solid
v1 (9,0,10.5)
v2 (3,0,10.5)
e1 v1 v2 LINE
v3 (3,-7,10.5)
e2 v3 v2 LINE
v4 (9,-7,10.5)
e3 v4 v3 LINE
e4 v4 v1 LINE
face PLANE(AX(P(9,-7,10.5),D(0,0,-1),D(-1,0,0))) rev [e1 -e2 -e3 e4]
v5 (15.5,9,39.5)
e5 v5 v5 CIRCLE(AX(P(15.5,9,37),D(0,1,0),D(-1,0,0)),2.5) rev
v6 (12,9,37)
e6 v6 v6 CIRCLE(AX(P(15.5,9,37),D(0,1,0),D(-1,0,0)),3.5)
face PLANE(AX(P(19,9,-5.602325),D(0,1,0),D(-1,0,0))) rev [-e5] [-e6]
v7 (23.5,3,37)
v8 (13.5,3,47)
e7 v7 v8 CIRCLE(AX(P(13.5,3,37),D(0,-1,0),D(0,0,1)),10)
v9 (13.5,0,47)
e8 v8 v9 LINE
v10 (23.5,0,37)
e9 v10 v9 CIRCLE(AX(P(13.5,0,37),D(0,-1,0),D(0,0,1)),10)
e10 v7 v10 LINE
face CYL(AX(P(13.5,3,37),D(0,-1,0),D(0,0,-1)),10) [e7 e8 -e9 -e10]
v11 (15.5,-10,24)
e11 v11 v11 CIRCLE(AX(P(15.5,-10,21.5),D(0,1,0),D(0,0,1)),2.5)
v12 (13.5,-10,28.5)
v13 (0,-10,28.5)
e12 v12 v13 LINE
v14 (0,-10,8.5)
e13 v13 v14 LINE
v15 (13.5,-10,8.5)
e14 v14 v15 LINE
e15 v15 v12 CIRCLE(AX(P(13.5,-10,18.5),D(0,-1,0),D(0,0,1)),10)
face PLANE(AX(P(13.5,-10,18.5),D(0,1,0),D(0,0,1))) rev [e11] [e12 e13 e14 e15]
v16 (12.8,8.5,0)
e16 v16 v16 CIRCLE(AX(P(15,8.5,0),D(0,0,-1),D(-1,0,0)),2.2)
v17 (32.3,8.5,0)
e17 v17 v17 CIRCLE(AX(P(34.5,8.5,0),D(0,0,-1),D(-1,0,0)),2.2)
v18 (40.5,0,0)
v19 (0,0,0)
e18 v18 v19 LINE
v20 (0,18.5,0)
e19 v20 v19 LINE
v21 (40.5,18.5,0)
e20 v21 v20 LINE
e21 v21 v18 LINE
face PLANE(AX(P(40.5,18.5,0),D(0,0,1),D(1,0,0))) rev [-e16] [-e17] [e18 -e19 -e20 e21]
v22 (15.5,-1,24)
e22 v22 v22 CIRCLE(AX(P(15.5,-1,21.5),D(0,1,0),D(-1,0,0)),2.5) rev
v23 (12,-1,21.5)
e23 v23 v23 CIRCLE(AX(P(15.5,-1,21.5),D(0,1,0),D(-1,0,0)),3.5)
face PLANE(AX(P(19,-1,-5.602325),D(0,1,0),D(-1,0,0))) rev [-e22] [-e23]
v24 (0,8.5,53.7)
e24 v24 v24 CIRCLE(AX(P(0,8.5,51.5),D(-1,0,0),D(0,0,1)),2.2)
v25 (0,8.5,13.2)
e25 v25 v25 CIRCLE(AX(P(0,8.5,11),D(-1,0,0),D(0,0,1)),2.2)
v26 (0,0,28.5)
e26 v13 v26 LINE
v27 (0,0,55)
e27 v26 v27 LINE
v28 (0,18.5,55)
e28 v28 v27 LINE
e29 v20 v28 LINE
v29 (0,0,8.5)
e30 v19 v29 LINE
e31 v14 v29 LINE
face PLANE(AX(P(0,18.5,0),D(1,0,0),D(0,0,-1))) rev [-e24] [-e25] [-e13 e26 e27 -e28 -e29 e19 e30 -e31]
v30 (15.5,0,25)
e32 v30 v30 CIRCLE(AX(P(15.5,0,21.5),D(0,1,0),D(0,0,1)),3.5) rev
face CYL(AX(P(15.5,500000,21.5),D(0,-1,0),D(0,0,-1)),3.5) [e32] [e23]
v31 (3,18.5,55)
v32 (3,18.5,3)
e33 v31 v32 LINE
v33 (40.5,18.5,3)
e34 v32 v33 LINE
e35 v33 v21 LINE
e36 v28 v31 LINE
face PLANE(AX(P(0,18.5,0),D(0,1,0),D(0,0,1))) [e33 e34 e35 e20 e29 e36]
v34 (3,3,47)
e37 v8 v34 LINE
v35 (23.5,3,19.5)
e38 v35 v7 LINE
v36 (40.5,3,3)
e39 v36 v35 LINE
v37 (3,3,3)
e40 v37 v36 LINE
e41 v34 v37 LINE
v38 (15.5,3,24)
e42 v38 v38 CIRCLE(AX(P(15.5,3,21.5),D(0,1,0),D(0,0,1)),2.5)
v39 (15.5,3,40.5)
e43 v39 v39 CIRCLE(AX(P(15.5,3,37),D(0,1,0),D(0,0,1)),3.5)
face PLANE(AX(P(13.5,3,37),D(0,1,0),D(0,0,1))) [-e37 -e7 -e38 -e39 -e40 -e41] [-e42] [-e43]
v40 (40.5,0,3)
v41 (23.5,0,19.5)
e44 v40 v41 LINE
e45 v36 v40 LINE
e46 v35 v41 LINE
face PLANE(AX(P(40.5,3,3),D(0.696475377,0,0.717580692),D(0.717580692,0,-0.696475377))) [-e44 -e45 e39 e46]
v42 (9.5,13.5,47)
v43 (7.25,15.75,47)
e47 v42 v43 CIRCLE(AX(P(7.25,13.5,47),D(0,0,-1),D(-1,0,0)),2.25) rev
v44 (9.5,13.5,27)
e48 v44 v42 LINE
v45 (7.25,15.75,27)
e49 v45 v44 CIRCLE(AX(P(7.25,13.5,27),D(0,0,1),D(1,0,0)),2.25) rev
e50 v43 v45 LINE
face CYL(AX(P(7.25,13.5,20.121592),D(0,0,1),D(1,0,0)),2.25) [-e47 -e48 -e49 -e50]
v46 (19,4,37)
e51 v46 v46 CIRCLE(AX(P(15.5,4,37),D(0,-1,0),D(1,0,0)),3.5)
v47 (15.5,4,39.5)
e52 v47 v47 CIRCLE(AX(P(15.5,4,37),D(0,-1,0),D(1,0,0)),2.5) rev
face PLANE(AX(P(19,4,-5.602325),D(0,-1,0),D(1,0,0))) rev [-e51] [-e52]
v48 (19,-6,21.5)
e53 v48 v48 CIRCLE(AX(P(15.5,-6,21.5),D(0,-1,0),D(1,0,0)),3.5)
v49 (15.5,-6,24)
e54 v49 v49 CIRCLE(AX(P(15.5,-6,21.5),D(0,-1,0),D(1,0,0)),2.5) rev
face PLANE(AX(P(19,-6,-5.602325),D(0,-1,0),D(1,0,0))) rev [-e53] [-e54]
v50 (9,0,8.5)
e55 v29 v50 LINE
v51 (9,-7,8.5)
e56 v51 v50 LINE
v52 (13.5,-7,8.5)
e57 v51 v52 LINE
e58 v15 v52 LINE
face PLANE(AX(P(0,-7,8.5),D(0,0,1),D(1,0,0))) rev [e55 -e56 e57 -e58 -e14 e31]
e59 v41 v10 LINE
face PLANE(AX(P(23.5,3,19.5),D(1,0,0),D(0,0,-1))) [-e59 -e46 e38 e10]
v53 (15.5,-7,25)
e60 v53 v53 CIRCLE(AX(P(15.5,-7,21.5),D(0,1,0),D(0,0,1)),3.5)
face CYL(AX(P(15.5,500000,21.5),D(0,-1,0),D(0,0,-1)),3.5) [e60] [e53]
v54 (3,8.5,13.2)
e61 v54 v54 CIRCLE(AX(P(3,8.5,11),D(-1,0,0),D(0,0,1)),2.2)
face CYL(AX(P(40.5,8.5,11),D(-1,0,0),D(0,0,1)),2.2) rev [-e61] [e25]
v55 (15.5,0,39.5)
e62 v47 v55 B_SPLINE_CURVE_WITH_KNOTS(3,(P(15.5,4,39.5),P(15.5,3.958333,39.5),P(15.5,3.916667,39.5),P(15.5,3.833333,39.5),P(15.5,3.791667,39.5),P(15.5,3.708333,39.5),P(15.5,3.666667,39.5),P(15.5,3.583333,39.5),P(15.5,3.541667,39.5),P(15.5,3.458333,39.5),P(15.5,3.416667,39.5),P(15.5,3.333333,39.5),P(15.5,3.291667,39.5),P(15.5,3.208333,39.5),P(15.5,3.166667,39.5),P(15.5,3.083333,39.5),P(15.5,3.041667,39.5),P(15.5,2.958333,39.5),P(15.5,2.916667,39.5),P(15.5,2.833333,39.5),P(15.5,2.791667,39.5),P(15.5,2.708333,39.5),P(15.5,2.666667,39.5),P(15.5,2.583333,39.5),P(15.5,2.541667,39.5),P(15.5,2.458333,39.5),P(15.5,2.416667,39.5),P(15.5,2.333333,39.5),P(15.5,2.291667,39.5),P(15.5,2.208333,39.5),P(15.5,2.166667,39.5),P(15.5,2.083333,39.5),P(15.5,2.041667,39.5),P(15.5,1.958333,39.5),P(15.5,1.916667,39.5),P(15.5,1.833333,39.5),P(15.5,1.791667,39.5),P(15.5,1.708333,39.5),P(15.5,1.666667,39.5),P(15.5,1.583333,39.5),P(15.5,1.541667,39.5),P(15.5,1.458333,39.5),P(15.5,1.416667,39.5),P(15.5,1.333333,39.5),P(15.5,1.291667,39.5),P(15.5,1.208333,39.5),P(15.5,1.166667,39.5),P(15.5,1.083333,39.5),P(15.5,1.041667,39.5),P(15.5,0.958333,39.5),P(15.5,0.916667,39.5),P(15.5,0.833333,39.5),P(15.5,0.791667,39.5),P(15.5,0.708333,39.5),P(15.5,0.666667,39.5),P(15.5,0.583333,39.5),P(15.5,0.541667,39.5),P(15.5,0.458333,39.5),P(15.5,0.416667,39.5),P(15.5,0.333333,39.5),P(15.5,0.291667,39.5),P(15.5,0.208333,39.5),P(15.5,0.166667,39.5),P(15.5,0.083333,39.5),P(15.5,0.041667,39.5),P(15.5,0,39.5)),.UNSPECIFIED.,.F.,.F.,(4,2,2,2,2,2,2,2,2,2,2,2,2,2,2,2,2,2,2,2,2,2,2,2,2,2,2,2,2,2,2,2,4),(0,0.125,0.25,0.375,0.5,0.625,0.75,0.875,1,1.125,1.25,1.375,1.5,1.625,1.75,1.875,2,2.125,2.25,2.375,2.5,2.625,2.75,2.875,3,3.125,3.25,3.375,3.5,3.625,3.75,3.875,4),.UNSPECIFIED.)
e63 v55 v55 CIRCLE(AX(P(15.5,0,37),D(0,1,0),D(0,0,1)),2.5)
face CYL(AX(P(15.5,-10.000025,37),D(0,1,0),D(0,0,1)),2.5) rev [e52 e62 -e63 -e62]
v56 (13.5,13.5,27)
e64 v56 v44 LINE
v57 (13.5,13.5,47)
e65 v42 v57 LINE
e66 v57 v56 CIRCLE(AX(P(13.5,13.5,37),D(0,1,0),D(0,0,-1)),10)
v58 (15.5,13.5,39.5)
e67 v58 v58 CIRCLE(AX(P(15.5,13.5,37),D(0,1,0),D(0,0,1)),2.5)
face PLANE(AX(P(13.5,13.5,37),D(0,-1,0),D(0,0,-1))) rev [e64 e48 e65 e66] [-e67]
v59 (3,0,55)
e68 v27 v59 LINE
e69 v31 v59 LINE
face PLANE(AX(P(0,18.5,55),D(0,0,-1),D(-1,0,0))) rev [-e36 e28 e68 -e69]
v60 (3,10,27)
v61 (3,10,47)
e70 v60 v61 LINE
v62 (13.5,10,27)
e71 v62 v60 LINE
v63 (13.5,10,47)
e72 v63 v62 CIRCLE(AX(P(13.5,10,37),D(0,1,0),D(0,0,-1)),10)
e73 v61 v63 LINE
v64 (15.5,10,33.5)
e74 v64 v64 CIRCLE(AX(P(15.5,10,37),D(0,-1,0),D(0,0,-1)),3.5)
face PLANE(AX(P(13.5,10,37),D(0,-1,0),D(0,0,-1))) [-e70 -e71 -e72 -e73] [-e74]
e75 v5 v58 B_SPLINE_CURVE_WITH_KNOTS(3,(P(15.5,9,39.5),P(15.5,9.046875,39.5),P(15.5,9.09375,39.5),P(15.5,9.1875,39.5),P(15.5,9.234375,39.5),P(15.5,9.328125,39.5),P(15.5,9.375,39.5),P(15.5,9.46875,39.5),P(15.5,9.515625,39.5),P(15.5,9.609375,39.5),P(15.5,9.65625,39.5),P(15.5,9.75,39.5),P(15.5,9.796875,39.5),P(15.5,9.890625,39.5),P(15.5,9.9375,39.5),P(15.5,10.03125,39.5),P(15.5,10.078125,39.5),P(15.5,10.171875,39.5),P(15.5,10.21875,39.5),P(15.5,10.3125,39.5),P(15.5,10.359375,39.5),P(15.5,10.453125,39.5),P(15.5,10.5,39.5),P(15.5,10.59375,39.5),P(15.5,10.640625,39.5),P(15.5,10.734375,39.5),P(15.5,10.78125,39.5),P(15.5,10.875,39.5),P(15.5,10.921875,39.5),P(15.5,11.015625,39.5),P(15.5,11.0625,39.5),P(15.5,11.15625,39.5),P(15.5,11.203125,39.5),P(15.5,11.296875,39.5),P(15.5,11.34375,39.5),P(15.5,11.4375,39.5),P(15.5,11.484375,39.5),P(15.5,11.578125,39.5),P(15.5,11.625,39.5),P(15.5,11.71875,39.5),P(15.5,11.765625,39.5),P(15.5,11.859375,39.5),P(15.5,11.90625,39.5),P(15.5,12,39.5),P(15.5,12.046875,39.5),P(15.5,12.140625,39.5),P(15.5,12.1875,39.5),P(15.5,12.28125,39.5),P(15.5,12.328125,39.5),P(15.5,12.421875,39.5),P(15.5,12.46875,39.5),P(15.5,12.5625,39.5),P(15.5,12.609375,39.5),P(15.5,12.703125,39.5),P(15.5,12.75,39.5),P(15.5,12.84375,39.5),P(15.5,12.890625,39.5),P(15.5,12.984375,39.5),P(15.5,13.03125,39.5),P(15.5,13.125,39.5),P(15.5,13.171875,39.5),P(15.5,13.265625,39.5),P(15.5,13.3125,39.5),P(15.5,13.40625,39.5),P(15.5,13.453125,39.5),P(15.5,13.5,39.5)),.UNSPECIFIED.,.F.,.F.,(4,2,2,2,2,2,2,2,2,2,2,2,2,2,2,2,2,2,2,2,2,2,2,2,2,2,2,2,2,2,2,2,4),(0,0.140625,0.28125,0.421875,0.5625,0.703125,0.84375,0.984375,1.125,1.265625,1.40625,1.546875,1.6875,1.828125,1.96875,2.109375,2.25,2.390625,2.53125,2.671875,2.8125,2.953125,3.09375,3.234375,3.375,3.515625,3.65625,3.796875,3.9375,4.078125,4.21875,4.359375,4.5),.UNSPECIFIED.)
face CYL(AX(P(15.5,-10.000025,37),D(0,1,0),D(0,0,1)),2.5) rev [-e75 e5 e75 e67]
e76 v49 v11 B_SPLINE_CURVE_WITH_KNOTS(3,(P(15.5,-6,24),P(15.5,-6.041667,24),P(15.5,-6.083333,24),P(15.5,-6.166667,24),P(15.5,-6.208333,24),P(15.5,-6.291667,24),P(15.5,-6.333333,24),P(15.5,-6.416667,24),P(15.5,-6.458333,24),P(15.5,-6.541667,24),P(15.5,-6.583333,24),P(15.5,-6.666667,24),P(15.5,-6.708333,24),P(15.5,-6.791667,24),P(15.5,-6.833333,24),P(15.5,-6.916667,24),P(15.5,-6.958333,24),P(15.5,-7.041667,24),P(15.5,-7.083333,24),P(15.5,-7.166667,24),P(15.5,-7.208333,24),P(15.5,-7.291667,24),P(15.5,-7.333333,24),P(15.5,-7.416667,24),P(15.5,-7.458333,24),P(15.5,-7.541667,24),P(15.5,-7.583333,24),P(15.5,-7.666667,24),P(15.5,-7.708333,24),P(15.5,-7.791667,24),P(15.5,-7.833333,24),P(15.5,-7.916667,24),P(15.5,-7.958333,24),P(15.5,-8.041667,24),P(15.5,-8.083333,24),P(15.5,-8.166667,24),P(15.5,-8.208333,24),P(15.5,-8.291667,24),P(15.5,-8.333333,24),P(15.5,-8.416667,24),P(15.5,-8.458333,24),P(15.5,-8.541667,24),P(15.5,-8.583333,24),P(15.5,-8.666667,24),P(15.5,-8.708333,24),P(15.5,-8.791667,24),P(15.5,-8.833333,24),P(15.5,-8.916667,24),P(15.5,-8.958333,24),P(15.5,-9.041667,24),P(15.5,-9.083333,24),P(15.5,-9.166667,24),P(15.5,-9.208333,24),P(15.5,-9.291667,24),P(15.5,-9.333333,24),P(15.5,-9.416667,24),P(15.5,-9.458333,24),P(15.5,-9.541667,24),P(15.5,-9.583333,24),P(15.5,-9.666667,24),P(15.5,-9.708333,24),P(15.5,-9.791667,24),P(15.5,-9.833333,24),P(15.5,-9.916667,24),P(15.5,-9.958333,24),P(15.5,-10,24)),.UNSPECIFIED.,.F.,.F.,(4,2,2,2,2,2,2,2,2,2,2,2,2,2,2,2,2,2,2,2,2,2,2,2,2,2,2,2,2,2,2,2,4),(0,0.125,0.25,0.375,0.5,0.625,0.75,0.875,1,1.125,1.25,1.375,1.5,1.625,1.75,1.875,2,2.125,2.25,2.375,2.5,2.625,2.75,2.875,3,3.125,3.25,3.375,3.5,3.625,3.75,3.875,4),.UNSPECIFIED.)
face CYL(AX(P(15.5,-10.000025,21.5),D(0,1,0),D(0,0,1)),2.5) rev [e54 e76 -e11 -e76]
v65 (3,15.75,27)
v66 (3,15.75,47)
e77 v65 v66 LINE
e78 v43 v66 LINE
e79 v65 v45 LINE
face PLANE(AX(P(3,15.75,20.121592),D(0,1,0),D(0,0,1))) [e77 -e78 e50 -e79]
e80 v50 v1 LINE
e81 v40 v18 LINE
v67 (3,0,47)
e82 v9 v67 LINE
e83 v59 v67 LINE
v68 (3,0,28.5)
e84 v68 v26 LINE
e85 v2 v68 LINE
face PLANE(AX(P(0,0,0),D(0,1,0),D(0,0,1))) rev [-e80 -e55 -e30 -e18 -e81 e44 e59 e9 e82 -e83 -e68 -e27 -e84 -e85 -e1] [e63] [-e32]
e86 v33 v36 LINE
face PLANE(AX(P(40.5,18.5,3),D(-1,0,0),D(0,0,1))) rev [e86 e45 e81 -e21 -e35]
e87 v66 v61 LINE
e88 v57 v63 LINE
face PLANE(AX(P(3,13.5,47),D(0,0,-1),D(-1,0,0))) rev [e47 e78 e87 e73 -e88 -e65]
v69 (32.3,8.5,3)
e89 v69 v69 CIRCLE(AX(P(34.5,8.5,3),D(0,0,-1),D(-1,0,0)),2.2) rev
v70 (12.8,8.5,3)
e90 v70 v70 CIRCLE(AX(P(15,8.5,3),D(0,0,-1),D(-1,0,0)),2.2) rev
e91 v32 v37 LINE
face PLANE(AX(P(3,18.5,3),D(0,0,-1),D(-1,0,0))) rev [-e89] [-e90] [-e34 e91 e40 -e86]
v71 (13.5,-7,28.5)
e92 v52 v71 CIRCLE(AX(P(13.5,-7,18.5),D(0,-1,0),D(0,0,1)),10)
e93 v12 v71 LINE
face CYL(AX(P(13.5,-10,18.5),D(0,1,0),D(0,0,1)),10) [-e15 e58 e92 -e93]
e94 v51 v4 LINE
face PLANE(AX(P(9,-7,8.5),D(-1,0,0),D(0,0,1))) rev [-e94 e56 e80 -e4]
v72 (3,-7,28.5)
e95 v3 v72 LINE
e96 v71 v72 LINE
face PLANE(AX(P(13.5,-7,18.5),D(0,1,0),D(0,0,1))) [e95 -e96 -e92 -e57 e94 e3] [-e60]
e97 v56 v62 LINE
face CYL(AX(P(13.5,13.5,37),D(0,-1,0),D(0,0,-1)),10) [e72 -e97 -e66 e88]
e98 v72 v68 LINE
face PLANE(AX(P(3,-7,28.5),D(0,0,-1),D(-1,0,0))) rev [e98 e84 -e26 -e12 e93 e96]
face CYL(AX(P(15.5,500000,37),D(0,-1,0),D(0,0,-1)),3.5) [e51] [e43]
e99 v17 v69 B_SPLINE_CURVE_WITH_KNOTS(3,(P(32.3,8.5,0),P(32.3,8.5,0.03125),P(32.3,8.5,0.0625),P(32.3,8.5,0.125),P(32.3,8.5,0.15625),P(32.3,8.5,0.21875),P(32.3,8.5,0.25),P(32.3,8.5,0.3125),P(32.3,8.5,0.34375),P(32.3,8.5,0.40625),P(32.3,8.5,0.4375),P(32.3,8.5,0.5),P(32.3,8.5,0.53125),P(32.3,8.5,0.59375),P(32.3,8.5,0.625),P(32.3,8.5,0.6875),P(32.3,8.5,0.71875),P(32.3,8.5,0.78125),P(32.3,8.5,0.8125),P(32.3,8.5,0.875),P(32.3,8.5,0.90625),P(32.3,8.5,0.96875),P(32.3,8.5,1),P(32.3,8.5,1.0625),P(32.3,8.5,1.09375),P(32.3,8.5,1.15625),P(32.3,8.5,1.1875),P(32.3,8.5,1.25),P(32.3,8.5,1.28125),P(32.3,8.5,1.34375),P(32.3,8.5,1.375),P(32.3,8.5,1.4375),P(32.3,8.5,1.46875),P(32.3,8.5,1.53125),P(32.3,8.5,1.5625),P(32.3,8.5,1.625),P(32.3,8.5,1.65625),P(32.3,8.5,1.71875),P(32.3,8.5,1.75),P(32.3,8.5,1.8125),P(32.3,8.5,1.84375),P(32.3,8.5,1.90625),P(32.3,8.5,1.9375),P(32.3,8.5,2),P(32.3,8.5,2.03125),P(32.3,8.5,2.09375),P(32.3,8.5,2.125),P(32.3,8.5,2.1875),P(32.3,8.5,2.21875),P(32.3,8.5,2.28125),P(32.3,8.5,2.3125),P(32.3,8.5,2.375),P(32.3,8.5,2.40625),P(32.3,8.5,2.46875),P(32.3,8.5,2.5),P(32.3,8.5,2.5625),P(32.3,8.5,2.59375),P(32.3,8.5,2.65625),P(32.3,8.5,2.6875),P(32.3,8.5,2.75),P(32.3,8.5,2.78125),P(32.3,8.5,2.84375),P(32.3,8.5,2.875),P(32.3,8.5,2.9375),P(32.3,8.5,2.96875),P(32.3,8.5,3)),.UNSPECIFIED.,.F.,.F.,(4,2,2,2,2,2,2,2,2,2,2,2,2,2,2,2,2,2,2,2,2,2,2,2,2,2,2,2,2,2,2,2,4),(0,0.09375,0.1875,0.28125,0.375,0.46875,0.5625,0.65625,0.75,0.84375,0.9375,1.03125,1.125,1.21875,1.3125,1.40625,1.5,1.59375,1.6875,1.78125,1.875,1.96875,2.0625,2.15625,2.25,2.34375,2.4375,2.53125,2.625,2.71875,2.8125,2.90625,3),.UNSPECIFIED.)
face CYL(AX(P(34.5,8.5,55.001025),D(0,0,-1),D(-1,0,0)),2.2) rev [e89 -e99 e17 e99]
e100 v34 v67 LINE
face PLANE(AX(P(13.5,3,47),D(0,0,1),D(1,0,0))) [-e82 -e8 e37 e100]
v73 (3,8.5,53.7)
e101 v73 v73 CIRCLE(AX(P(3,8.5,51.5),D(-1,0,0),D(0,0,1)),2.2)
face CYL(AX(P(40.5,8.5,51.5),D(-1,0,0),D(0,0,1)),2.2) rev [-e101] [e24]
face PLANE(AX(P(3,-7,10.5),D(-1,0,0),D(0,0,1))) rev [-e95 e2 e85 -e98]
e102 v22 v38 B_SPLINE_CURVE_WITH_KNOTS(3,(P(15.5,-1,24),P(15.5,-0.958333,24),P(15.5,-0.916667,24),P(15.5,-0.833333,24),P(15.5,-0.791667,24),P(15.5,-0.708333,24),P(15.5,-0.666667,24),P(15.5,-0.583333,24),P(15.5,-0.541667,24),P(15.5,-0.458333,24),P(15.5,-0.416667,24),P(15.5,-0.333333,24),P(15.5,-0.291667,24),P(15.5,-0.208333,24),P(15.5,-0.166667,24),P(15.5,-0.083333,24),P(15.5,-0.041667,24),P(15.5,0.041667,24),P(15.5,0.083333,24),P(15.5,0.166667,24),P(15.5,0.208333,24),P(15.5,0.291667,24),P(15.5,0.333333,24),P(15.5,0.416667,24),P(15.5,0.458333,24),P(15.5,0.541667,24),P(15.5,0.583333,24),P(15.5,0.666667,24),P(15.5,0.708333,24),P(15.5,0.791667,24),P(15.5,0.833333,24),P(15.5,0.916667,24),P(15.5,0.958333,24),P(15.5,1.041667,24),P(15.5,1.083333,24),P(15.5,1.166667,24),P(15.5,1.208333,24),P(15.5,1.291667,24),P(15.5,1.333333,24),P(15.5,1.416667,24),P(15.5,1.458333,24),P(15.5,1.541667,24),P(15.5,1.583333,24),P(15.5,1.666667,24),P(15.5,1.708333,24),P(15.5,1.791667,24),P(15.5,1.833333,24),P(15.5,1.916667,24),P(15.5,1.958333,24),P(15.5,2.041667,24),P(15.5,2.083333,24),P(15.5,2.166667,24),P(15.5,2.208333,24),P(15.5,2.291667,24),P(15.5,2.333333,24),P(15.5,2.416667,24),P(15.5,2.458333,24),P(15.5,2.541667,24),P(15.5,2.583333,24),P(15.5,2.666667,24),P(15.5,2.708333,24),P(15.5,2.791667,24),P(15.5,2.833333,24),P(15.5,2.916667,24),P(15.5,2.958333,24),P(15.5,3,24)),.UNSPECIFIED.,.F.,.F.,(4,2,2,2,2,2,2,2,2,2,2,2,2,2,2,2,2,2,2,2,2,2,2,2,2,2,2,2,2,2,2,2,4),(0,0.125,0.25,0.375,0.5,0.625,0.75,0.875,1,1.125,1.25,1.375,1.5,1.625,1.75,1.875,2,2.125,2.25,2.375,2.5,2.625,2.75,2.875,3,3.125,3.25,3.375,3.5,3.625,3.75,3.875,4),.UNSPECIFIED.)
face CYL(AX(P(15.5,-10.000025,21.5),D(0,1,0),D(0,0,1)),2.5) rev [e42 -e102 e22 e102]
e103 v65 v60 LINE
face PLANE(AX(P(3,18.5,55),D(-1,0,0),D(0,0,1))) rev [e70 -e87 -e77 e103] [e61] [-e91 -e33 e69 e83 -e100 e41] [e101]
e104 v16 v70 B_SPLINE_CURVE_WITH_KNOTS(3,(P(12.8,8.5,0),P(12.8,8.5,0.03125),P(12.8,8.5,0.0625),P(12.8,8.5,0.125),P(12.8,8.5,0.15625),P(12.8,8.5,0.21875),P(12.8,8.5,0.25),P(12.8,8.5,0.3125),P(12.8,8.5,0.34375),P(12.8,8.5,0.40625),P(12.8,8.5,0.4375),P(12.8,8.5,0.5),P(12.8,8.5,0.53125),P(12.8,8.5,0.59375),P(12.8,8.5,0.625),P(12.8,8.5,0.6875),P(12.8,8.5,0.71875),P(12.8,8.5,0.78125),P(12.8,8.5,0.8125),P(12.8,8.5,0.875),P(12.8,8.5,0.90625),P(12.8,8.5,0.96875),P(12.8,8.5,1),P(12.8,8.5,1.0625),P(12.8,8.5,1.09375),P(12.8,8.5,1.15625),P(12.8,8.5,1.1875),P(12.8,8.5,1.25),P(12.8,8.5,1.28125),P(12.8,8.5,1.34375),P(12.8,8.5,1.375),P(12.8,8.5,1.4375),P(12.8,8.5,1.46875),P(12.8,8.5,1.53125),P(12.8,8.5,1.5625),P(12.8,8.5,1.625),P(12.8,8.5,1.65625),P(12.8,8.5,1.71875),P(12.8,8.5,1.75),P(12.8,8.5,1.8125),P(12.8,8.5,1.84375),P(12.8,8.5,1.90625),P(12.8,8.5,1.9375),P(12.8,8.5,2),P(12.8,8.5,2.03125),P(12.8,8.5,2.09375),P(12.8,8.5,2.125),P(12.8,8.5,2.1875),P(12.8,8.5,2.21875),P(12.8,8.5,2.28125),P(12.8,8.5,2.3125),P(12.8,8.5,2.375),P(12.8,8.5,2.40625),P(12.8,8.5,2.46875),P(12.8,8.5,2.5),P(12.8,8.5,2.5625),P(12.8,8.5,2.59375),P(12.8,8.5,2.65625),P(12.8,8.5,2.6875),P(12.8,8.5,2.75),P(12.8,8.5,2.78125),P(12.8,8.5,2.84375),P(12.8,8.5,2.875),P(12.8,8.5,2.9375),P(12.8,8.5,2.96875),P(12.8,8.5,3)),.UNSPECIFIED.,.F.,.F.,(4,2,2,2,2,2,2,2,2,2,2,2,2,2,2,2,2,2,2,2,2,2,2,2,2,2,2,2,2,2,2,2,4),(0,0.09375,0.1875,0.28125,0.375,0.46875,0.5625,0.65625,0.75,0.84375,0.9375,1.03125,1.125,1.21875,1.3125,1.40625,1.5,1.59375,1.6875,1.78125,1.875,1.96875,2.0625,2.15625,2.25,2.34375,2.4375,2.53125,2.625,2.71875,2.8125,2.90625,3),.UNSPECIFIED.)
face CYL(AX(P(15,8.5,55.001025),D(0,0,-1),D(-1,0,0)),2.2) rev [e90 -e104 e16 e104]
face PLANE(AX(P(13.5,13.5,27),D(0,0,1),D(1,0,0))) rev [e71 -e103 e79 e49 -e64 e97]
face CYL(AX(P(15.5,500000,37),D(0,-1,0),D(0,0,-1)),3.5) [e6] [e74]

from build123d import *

# Parameters (mm, degrees)
BOSS_EXTRUDE1_DEPTH = 18.5
BOSS_EXTRUDE2_DEPTH = 3
BOSS_EXTRUDE3_START = 7
BOSS_EXTRUDE3_DEPTH = 3.5
SKETCH4_W           = 6.5
SKETCH4_H           = 2.25
BOSS_EXTRUDE4_DEPTH = 20
FILLET1_R           = 2.25
BOSS_EXTRUDE5_DEPTH = 7
BOSS_EXTRUDE6_DEPTH = 3
SKETCH7_R           = 2.5
CUT_EXTRUDE1_DEPTH  = 73.232264259
SKETCH8_R           = 2.2
CUT_EXTRUDE2_DEPTH  = 71.763691255
CUT_EXTRUDE3_REACH  = 72.764
SKETCH9_R           = 2.2
BOSS_EXTRUDE7_REACH = 74.907
SKETCH10_R          = 3.5
SKETCH10_R_2        = 2.5
BOSS_EXTRUDE8_REACH = 72.039
SKETCH11_R          = 3.5
SKETCH11_R_2        = 2.5
CUT_EXTRUDE4_REACH  = 66.742
SKETCH12_W          = 7
SKETCH12_H          = 5


with BuildPart() as part:
    # Sketch1 → Boss-Extrude1 (new body)
    with BuildSketch(Plane(origin=(0, 0, 0), x_dir=(1, 0, 0), z_dir=(0, 1, 0))):
        Polygon((40.5, 0), (0, 0), (0, -55), (3, -55), (3, -3), (40.5, -3), align=None)
    extrude(amount=BOSS_EXTRUDE1_DEPTH)

    # Sketch2 → Boss-Extrude2 (add)
    with BuildSketch(Plane.XZ):
        with BuildLine():
            Line((40.5, 3), (23.5, 19.5))
            Line((23.5, 19.5), (23.5, 37))
            ThreePointArc((23.5, 37), (20.571067812, 44.071067812), (13.5, 47))
            Line((13.5, 47), (3, 47))
            Line((3, 47), (3, 3))
            Line((3, 3), (40.5, 3))
        make_face()
    extrude(amount=-BOSS_EXTRUDE2_DEPTH)

    # Sketch3 → Boss-Extrude3 (add)
    with BuildSketch(Plane(origin=(0, 3, 0), x_dir=(1, 0, 0), z_dir=(0, 1, 0)).offset(BOSS_EXTRUDE3_START)):
        with BuildLine():
            Line((3, -47), (13.5, -47))
            ThreePointArc((13.5, -47), (23.5, -37), (13.5, -27))
            Line((13.5, -27), (3, -27))
            Line((3, -27), (3, -47))
        make_face()
    extrude(amount=BOSS_EXTRUDE3_DEPTH)

    # Sketch4 → Boss-Extrude4 (add)
    with BuildSketch(Plane.XY.offset(47)):
        with Locations((6.25, 14.625)):
            Rectangle(SKETCH4_W, SKETCH4_H)
    extrude(amount=-BOSS_EXTRUDE4_DEPTH)

    # Fillet1
    fillet1_edges = [part.edges().sort_by_distance(p)[0] for p in [
        (9.5, 15.75, 37),
    ]]
    fillet(fillet1_edges, radius=FILLET1_R - 0.0001)  # a hair under: the kernel refuses the full size

    # Sketch5 → Boss-Extrude5 (add)
    with BuildSketch(Plane.XZ):
        Polygon((0, 28.5), (0, 8.5), (9, 8.5), (9, 10.5), (3, 10.5), (3, 28.5), align=None)
    extrude(amount=BOSS_EXTRUDE5_DEPTH)

    # Sketch6 → Boss-Extrude6 (add)
    with BuildSketch(Plane.XZ.offset(7)):
        with BuildLine():
            Line((0, 8.5), (0, 28.5))
            Line((0, 28.5), (13.5, 28.5))
            ThreePointArc((13.5, 28.5), (23.5, 18.5), (13.5, 8.5))
            Line((13.5, 8.5), (0, 8.5))
        make_face()
    extrude(amount=BOSS_EXTRUDE6_DEPTH)

    # Sketch7 → Cut-Extrude1 (cut, through all)
    with BuildSketch(Plane(origin=(0, 13.5, 0), x_dir=(1, 0, 0), z_dir=(0, 1, 0))):
        with Locations(Location((15.5, -21.5, 0), (0, 0, 270))):
            Circle(SKETCH7_R)
        with Locations(Location((15.5, -37, 0), (0, 0, 270))):
            Circle(SKETCH7_R)
    extrude(amount=-CUT_EXTRUDE1_DEPTH, mode=Mode.SUBTRACT)

    # Sketch8 → Cut-Extrude2 (cut, through all)
    with BuildSketch(Plane.ZY):
        with Locations((11, 8.5)):
            Circle(SKETCH8_R)
        with Locations((51.5, 8.5)):
            Circle(SKETCH8_R)
    extrude(amount=-CUT_EXTRUDE2_DEPTH, mode=Mode.SUBTRACT)

    # Sketch9 → Cut-Extrude3 (cut, up to next)
    with BuildSketch(Plane(origin=(0, 0, 0), x_dir=(-1, 0, 0), z_dir=(0, 0, -1)), mode=Mode.PRIVATE) as cut_extrude3_sk1:
        with Locations((-34.5, 8.5)):
            Circle(SKETCH9_R)
    cut_extrude3_tool1 = extrude(cut_extrude3_sk1.sketch, amount=-CUT_EXTRUDE3_REACH, mode=Mode.PRIVATE) & part.part
    # Sketch9 → Cut-Extrude3 (cut, up to next)
    with BuildSketch(Plane(origin=(0, 0, 0), x_dir=(-1, 0, 0), z_dir=(0, 0, -1)), mode=Mode.PRIVATE) as cut_extrude3_sk2:
        with Locations((-15, 8.5)):
            Circle(SKETCH9_R)
    cut_extrude3_tool2 = extrude(cut_extrude3_sk2.sketch, amount=-CUT_EXTRUDE3_REACH, mode=Mode.PRIVATE) & part.part
    add(cut_extrude3_tool1.solids().sort_by_distance((34.5, 8.5, 0))[0], mode=Mode.SUBTRACT)
    add(cut_extrude3_tool2.solids().sort_by_distance((15, 8.5, 0))[0], mode=Mode.SUBTRACT)

    # Sketch10 → Boss-Extrude7 (add, up to next)
    with BuildSketch(Plane(origin=(0, -7, 0), x_dir=(1, 0, 0), z_dir=(0, 1, 0)), mode=Mode.PRIVATE) as boss_extrude7_sk1:
        with Locations(Location((15.5, -21.5, 0), (0, 0, 270))):
            Circle(SKETCH10_R)
        with Locations(Location((15.5, -21.5, 0), (0, 0, 270))):
            Circle(SKETCH10_R_2, mode=Mode.SUBTRACT)
    boss_extrude7_tool1 = extrude(boss_extrude7_sk1.sketch, amount=BOSS_EXTRUDE7_REACH, mode=Mode.PRIVATE) - part.part
    add(boss_extrude7_tool1.solids().sort_by_distance((15.5, -7, 18.098995))[0])

    # Sketch11 → Boss-Extrude8 (add, up to next)
    with BuildSketch(Plane(origin=(0, 3, 0), x_dir=(1, 0, 0), z_dir=(0, 1, 0)), mode=Mode.PRIVATE) as boss_extrude8_sk1:
        with Locations(Location((15.5, -37, 0), (0, 0, 90))):
            Circle(SKETCH11_R)
        with Locations(Location((15.5, -37, 0), (0, 0, 270))):
            Circle(SKETCH11_R_2, mode=Mode.SUBTRACT)
    boss_extrude8_tool1 = extrude(boss_extrude8_sk1.sketch, amount=BOSS_EXTRUDE8_REACH, mode=Mode.PRIVATE) - part.part
    add(boss_extrude8_tool1.solids().sort_by_distance((15.5, 3, 40.401005))[0])

    # Cut-Extrude4: up to this face of the body (flat: up to its plane)
    cut_extrude4_end = Plane(part.part.faces().sort_by_distance((21.584376674, 10.874217494, 3))[0])
    # Sketch12 → Cut-Extrude4 (cut, up to the picked face)
    with BuildSketch(Plane.XY.offset(47), mode=Mode.PRIVATE) as cut_extrude4_sk1:
        with Locations((15.5, -3.5)):
            Rectangle(SKETCH12_W, SKETCH12_H)
    cut_extrude4_tool1 = split(extrude(cut_extrude4_sk1.sketch, amount=-CUT_EXTRUDE4_REACH, mode=Mode.PRIVATE), bisect_by=cut_extrude4_end, keep=Keep.BOTH, mode=Mode.PRIVATE)
    # Sketch12 → Cut-Extrude4 (cut, up to the picked face)
    with BuildSketch(Plane.XY.offset(47), mode=Mode.PRIVATE) as cut_extrude4_sk2:
        with Locations((15.5, 6.5)):
            Rectangle(SKETCH12_W, SKETCH12_H)
    cut_extrude4_tool2 = split(extrude(cut_extrude4_sk2.sketch, amount=-CUT_EXTRUDE4_REACH, mode=Mode.PRIVATE), bisect_by=cut_extrude4_end, keep=Keep.BOTH, mode=Mode.PRIVATE)
    add(cut_extrude4_tool1.solids().sort_by(Axis((15.5, -3.5, 47), (0, 0, -1)))[0], mode=Mode.SUBTRACT)
    add(cut_extrude4_tool2.solids().sort_by(Axis((15.5, 6.5, 47), (0, 0, -1)))[0], mode=Mode.SUBTRACT)


solid = part.part
